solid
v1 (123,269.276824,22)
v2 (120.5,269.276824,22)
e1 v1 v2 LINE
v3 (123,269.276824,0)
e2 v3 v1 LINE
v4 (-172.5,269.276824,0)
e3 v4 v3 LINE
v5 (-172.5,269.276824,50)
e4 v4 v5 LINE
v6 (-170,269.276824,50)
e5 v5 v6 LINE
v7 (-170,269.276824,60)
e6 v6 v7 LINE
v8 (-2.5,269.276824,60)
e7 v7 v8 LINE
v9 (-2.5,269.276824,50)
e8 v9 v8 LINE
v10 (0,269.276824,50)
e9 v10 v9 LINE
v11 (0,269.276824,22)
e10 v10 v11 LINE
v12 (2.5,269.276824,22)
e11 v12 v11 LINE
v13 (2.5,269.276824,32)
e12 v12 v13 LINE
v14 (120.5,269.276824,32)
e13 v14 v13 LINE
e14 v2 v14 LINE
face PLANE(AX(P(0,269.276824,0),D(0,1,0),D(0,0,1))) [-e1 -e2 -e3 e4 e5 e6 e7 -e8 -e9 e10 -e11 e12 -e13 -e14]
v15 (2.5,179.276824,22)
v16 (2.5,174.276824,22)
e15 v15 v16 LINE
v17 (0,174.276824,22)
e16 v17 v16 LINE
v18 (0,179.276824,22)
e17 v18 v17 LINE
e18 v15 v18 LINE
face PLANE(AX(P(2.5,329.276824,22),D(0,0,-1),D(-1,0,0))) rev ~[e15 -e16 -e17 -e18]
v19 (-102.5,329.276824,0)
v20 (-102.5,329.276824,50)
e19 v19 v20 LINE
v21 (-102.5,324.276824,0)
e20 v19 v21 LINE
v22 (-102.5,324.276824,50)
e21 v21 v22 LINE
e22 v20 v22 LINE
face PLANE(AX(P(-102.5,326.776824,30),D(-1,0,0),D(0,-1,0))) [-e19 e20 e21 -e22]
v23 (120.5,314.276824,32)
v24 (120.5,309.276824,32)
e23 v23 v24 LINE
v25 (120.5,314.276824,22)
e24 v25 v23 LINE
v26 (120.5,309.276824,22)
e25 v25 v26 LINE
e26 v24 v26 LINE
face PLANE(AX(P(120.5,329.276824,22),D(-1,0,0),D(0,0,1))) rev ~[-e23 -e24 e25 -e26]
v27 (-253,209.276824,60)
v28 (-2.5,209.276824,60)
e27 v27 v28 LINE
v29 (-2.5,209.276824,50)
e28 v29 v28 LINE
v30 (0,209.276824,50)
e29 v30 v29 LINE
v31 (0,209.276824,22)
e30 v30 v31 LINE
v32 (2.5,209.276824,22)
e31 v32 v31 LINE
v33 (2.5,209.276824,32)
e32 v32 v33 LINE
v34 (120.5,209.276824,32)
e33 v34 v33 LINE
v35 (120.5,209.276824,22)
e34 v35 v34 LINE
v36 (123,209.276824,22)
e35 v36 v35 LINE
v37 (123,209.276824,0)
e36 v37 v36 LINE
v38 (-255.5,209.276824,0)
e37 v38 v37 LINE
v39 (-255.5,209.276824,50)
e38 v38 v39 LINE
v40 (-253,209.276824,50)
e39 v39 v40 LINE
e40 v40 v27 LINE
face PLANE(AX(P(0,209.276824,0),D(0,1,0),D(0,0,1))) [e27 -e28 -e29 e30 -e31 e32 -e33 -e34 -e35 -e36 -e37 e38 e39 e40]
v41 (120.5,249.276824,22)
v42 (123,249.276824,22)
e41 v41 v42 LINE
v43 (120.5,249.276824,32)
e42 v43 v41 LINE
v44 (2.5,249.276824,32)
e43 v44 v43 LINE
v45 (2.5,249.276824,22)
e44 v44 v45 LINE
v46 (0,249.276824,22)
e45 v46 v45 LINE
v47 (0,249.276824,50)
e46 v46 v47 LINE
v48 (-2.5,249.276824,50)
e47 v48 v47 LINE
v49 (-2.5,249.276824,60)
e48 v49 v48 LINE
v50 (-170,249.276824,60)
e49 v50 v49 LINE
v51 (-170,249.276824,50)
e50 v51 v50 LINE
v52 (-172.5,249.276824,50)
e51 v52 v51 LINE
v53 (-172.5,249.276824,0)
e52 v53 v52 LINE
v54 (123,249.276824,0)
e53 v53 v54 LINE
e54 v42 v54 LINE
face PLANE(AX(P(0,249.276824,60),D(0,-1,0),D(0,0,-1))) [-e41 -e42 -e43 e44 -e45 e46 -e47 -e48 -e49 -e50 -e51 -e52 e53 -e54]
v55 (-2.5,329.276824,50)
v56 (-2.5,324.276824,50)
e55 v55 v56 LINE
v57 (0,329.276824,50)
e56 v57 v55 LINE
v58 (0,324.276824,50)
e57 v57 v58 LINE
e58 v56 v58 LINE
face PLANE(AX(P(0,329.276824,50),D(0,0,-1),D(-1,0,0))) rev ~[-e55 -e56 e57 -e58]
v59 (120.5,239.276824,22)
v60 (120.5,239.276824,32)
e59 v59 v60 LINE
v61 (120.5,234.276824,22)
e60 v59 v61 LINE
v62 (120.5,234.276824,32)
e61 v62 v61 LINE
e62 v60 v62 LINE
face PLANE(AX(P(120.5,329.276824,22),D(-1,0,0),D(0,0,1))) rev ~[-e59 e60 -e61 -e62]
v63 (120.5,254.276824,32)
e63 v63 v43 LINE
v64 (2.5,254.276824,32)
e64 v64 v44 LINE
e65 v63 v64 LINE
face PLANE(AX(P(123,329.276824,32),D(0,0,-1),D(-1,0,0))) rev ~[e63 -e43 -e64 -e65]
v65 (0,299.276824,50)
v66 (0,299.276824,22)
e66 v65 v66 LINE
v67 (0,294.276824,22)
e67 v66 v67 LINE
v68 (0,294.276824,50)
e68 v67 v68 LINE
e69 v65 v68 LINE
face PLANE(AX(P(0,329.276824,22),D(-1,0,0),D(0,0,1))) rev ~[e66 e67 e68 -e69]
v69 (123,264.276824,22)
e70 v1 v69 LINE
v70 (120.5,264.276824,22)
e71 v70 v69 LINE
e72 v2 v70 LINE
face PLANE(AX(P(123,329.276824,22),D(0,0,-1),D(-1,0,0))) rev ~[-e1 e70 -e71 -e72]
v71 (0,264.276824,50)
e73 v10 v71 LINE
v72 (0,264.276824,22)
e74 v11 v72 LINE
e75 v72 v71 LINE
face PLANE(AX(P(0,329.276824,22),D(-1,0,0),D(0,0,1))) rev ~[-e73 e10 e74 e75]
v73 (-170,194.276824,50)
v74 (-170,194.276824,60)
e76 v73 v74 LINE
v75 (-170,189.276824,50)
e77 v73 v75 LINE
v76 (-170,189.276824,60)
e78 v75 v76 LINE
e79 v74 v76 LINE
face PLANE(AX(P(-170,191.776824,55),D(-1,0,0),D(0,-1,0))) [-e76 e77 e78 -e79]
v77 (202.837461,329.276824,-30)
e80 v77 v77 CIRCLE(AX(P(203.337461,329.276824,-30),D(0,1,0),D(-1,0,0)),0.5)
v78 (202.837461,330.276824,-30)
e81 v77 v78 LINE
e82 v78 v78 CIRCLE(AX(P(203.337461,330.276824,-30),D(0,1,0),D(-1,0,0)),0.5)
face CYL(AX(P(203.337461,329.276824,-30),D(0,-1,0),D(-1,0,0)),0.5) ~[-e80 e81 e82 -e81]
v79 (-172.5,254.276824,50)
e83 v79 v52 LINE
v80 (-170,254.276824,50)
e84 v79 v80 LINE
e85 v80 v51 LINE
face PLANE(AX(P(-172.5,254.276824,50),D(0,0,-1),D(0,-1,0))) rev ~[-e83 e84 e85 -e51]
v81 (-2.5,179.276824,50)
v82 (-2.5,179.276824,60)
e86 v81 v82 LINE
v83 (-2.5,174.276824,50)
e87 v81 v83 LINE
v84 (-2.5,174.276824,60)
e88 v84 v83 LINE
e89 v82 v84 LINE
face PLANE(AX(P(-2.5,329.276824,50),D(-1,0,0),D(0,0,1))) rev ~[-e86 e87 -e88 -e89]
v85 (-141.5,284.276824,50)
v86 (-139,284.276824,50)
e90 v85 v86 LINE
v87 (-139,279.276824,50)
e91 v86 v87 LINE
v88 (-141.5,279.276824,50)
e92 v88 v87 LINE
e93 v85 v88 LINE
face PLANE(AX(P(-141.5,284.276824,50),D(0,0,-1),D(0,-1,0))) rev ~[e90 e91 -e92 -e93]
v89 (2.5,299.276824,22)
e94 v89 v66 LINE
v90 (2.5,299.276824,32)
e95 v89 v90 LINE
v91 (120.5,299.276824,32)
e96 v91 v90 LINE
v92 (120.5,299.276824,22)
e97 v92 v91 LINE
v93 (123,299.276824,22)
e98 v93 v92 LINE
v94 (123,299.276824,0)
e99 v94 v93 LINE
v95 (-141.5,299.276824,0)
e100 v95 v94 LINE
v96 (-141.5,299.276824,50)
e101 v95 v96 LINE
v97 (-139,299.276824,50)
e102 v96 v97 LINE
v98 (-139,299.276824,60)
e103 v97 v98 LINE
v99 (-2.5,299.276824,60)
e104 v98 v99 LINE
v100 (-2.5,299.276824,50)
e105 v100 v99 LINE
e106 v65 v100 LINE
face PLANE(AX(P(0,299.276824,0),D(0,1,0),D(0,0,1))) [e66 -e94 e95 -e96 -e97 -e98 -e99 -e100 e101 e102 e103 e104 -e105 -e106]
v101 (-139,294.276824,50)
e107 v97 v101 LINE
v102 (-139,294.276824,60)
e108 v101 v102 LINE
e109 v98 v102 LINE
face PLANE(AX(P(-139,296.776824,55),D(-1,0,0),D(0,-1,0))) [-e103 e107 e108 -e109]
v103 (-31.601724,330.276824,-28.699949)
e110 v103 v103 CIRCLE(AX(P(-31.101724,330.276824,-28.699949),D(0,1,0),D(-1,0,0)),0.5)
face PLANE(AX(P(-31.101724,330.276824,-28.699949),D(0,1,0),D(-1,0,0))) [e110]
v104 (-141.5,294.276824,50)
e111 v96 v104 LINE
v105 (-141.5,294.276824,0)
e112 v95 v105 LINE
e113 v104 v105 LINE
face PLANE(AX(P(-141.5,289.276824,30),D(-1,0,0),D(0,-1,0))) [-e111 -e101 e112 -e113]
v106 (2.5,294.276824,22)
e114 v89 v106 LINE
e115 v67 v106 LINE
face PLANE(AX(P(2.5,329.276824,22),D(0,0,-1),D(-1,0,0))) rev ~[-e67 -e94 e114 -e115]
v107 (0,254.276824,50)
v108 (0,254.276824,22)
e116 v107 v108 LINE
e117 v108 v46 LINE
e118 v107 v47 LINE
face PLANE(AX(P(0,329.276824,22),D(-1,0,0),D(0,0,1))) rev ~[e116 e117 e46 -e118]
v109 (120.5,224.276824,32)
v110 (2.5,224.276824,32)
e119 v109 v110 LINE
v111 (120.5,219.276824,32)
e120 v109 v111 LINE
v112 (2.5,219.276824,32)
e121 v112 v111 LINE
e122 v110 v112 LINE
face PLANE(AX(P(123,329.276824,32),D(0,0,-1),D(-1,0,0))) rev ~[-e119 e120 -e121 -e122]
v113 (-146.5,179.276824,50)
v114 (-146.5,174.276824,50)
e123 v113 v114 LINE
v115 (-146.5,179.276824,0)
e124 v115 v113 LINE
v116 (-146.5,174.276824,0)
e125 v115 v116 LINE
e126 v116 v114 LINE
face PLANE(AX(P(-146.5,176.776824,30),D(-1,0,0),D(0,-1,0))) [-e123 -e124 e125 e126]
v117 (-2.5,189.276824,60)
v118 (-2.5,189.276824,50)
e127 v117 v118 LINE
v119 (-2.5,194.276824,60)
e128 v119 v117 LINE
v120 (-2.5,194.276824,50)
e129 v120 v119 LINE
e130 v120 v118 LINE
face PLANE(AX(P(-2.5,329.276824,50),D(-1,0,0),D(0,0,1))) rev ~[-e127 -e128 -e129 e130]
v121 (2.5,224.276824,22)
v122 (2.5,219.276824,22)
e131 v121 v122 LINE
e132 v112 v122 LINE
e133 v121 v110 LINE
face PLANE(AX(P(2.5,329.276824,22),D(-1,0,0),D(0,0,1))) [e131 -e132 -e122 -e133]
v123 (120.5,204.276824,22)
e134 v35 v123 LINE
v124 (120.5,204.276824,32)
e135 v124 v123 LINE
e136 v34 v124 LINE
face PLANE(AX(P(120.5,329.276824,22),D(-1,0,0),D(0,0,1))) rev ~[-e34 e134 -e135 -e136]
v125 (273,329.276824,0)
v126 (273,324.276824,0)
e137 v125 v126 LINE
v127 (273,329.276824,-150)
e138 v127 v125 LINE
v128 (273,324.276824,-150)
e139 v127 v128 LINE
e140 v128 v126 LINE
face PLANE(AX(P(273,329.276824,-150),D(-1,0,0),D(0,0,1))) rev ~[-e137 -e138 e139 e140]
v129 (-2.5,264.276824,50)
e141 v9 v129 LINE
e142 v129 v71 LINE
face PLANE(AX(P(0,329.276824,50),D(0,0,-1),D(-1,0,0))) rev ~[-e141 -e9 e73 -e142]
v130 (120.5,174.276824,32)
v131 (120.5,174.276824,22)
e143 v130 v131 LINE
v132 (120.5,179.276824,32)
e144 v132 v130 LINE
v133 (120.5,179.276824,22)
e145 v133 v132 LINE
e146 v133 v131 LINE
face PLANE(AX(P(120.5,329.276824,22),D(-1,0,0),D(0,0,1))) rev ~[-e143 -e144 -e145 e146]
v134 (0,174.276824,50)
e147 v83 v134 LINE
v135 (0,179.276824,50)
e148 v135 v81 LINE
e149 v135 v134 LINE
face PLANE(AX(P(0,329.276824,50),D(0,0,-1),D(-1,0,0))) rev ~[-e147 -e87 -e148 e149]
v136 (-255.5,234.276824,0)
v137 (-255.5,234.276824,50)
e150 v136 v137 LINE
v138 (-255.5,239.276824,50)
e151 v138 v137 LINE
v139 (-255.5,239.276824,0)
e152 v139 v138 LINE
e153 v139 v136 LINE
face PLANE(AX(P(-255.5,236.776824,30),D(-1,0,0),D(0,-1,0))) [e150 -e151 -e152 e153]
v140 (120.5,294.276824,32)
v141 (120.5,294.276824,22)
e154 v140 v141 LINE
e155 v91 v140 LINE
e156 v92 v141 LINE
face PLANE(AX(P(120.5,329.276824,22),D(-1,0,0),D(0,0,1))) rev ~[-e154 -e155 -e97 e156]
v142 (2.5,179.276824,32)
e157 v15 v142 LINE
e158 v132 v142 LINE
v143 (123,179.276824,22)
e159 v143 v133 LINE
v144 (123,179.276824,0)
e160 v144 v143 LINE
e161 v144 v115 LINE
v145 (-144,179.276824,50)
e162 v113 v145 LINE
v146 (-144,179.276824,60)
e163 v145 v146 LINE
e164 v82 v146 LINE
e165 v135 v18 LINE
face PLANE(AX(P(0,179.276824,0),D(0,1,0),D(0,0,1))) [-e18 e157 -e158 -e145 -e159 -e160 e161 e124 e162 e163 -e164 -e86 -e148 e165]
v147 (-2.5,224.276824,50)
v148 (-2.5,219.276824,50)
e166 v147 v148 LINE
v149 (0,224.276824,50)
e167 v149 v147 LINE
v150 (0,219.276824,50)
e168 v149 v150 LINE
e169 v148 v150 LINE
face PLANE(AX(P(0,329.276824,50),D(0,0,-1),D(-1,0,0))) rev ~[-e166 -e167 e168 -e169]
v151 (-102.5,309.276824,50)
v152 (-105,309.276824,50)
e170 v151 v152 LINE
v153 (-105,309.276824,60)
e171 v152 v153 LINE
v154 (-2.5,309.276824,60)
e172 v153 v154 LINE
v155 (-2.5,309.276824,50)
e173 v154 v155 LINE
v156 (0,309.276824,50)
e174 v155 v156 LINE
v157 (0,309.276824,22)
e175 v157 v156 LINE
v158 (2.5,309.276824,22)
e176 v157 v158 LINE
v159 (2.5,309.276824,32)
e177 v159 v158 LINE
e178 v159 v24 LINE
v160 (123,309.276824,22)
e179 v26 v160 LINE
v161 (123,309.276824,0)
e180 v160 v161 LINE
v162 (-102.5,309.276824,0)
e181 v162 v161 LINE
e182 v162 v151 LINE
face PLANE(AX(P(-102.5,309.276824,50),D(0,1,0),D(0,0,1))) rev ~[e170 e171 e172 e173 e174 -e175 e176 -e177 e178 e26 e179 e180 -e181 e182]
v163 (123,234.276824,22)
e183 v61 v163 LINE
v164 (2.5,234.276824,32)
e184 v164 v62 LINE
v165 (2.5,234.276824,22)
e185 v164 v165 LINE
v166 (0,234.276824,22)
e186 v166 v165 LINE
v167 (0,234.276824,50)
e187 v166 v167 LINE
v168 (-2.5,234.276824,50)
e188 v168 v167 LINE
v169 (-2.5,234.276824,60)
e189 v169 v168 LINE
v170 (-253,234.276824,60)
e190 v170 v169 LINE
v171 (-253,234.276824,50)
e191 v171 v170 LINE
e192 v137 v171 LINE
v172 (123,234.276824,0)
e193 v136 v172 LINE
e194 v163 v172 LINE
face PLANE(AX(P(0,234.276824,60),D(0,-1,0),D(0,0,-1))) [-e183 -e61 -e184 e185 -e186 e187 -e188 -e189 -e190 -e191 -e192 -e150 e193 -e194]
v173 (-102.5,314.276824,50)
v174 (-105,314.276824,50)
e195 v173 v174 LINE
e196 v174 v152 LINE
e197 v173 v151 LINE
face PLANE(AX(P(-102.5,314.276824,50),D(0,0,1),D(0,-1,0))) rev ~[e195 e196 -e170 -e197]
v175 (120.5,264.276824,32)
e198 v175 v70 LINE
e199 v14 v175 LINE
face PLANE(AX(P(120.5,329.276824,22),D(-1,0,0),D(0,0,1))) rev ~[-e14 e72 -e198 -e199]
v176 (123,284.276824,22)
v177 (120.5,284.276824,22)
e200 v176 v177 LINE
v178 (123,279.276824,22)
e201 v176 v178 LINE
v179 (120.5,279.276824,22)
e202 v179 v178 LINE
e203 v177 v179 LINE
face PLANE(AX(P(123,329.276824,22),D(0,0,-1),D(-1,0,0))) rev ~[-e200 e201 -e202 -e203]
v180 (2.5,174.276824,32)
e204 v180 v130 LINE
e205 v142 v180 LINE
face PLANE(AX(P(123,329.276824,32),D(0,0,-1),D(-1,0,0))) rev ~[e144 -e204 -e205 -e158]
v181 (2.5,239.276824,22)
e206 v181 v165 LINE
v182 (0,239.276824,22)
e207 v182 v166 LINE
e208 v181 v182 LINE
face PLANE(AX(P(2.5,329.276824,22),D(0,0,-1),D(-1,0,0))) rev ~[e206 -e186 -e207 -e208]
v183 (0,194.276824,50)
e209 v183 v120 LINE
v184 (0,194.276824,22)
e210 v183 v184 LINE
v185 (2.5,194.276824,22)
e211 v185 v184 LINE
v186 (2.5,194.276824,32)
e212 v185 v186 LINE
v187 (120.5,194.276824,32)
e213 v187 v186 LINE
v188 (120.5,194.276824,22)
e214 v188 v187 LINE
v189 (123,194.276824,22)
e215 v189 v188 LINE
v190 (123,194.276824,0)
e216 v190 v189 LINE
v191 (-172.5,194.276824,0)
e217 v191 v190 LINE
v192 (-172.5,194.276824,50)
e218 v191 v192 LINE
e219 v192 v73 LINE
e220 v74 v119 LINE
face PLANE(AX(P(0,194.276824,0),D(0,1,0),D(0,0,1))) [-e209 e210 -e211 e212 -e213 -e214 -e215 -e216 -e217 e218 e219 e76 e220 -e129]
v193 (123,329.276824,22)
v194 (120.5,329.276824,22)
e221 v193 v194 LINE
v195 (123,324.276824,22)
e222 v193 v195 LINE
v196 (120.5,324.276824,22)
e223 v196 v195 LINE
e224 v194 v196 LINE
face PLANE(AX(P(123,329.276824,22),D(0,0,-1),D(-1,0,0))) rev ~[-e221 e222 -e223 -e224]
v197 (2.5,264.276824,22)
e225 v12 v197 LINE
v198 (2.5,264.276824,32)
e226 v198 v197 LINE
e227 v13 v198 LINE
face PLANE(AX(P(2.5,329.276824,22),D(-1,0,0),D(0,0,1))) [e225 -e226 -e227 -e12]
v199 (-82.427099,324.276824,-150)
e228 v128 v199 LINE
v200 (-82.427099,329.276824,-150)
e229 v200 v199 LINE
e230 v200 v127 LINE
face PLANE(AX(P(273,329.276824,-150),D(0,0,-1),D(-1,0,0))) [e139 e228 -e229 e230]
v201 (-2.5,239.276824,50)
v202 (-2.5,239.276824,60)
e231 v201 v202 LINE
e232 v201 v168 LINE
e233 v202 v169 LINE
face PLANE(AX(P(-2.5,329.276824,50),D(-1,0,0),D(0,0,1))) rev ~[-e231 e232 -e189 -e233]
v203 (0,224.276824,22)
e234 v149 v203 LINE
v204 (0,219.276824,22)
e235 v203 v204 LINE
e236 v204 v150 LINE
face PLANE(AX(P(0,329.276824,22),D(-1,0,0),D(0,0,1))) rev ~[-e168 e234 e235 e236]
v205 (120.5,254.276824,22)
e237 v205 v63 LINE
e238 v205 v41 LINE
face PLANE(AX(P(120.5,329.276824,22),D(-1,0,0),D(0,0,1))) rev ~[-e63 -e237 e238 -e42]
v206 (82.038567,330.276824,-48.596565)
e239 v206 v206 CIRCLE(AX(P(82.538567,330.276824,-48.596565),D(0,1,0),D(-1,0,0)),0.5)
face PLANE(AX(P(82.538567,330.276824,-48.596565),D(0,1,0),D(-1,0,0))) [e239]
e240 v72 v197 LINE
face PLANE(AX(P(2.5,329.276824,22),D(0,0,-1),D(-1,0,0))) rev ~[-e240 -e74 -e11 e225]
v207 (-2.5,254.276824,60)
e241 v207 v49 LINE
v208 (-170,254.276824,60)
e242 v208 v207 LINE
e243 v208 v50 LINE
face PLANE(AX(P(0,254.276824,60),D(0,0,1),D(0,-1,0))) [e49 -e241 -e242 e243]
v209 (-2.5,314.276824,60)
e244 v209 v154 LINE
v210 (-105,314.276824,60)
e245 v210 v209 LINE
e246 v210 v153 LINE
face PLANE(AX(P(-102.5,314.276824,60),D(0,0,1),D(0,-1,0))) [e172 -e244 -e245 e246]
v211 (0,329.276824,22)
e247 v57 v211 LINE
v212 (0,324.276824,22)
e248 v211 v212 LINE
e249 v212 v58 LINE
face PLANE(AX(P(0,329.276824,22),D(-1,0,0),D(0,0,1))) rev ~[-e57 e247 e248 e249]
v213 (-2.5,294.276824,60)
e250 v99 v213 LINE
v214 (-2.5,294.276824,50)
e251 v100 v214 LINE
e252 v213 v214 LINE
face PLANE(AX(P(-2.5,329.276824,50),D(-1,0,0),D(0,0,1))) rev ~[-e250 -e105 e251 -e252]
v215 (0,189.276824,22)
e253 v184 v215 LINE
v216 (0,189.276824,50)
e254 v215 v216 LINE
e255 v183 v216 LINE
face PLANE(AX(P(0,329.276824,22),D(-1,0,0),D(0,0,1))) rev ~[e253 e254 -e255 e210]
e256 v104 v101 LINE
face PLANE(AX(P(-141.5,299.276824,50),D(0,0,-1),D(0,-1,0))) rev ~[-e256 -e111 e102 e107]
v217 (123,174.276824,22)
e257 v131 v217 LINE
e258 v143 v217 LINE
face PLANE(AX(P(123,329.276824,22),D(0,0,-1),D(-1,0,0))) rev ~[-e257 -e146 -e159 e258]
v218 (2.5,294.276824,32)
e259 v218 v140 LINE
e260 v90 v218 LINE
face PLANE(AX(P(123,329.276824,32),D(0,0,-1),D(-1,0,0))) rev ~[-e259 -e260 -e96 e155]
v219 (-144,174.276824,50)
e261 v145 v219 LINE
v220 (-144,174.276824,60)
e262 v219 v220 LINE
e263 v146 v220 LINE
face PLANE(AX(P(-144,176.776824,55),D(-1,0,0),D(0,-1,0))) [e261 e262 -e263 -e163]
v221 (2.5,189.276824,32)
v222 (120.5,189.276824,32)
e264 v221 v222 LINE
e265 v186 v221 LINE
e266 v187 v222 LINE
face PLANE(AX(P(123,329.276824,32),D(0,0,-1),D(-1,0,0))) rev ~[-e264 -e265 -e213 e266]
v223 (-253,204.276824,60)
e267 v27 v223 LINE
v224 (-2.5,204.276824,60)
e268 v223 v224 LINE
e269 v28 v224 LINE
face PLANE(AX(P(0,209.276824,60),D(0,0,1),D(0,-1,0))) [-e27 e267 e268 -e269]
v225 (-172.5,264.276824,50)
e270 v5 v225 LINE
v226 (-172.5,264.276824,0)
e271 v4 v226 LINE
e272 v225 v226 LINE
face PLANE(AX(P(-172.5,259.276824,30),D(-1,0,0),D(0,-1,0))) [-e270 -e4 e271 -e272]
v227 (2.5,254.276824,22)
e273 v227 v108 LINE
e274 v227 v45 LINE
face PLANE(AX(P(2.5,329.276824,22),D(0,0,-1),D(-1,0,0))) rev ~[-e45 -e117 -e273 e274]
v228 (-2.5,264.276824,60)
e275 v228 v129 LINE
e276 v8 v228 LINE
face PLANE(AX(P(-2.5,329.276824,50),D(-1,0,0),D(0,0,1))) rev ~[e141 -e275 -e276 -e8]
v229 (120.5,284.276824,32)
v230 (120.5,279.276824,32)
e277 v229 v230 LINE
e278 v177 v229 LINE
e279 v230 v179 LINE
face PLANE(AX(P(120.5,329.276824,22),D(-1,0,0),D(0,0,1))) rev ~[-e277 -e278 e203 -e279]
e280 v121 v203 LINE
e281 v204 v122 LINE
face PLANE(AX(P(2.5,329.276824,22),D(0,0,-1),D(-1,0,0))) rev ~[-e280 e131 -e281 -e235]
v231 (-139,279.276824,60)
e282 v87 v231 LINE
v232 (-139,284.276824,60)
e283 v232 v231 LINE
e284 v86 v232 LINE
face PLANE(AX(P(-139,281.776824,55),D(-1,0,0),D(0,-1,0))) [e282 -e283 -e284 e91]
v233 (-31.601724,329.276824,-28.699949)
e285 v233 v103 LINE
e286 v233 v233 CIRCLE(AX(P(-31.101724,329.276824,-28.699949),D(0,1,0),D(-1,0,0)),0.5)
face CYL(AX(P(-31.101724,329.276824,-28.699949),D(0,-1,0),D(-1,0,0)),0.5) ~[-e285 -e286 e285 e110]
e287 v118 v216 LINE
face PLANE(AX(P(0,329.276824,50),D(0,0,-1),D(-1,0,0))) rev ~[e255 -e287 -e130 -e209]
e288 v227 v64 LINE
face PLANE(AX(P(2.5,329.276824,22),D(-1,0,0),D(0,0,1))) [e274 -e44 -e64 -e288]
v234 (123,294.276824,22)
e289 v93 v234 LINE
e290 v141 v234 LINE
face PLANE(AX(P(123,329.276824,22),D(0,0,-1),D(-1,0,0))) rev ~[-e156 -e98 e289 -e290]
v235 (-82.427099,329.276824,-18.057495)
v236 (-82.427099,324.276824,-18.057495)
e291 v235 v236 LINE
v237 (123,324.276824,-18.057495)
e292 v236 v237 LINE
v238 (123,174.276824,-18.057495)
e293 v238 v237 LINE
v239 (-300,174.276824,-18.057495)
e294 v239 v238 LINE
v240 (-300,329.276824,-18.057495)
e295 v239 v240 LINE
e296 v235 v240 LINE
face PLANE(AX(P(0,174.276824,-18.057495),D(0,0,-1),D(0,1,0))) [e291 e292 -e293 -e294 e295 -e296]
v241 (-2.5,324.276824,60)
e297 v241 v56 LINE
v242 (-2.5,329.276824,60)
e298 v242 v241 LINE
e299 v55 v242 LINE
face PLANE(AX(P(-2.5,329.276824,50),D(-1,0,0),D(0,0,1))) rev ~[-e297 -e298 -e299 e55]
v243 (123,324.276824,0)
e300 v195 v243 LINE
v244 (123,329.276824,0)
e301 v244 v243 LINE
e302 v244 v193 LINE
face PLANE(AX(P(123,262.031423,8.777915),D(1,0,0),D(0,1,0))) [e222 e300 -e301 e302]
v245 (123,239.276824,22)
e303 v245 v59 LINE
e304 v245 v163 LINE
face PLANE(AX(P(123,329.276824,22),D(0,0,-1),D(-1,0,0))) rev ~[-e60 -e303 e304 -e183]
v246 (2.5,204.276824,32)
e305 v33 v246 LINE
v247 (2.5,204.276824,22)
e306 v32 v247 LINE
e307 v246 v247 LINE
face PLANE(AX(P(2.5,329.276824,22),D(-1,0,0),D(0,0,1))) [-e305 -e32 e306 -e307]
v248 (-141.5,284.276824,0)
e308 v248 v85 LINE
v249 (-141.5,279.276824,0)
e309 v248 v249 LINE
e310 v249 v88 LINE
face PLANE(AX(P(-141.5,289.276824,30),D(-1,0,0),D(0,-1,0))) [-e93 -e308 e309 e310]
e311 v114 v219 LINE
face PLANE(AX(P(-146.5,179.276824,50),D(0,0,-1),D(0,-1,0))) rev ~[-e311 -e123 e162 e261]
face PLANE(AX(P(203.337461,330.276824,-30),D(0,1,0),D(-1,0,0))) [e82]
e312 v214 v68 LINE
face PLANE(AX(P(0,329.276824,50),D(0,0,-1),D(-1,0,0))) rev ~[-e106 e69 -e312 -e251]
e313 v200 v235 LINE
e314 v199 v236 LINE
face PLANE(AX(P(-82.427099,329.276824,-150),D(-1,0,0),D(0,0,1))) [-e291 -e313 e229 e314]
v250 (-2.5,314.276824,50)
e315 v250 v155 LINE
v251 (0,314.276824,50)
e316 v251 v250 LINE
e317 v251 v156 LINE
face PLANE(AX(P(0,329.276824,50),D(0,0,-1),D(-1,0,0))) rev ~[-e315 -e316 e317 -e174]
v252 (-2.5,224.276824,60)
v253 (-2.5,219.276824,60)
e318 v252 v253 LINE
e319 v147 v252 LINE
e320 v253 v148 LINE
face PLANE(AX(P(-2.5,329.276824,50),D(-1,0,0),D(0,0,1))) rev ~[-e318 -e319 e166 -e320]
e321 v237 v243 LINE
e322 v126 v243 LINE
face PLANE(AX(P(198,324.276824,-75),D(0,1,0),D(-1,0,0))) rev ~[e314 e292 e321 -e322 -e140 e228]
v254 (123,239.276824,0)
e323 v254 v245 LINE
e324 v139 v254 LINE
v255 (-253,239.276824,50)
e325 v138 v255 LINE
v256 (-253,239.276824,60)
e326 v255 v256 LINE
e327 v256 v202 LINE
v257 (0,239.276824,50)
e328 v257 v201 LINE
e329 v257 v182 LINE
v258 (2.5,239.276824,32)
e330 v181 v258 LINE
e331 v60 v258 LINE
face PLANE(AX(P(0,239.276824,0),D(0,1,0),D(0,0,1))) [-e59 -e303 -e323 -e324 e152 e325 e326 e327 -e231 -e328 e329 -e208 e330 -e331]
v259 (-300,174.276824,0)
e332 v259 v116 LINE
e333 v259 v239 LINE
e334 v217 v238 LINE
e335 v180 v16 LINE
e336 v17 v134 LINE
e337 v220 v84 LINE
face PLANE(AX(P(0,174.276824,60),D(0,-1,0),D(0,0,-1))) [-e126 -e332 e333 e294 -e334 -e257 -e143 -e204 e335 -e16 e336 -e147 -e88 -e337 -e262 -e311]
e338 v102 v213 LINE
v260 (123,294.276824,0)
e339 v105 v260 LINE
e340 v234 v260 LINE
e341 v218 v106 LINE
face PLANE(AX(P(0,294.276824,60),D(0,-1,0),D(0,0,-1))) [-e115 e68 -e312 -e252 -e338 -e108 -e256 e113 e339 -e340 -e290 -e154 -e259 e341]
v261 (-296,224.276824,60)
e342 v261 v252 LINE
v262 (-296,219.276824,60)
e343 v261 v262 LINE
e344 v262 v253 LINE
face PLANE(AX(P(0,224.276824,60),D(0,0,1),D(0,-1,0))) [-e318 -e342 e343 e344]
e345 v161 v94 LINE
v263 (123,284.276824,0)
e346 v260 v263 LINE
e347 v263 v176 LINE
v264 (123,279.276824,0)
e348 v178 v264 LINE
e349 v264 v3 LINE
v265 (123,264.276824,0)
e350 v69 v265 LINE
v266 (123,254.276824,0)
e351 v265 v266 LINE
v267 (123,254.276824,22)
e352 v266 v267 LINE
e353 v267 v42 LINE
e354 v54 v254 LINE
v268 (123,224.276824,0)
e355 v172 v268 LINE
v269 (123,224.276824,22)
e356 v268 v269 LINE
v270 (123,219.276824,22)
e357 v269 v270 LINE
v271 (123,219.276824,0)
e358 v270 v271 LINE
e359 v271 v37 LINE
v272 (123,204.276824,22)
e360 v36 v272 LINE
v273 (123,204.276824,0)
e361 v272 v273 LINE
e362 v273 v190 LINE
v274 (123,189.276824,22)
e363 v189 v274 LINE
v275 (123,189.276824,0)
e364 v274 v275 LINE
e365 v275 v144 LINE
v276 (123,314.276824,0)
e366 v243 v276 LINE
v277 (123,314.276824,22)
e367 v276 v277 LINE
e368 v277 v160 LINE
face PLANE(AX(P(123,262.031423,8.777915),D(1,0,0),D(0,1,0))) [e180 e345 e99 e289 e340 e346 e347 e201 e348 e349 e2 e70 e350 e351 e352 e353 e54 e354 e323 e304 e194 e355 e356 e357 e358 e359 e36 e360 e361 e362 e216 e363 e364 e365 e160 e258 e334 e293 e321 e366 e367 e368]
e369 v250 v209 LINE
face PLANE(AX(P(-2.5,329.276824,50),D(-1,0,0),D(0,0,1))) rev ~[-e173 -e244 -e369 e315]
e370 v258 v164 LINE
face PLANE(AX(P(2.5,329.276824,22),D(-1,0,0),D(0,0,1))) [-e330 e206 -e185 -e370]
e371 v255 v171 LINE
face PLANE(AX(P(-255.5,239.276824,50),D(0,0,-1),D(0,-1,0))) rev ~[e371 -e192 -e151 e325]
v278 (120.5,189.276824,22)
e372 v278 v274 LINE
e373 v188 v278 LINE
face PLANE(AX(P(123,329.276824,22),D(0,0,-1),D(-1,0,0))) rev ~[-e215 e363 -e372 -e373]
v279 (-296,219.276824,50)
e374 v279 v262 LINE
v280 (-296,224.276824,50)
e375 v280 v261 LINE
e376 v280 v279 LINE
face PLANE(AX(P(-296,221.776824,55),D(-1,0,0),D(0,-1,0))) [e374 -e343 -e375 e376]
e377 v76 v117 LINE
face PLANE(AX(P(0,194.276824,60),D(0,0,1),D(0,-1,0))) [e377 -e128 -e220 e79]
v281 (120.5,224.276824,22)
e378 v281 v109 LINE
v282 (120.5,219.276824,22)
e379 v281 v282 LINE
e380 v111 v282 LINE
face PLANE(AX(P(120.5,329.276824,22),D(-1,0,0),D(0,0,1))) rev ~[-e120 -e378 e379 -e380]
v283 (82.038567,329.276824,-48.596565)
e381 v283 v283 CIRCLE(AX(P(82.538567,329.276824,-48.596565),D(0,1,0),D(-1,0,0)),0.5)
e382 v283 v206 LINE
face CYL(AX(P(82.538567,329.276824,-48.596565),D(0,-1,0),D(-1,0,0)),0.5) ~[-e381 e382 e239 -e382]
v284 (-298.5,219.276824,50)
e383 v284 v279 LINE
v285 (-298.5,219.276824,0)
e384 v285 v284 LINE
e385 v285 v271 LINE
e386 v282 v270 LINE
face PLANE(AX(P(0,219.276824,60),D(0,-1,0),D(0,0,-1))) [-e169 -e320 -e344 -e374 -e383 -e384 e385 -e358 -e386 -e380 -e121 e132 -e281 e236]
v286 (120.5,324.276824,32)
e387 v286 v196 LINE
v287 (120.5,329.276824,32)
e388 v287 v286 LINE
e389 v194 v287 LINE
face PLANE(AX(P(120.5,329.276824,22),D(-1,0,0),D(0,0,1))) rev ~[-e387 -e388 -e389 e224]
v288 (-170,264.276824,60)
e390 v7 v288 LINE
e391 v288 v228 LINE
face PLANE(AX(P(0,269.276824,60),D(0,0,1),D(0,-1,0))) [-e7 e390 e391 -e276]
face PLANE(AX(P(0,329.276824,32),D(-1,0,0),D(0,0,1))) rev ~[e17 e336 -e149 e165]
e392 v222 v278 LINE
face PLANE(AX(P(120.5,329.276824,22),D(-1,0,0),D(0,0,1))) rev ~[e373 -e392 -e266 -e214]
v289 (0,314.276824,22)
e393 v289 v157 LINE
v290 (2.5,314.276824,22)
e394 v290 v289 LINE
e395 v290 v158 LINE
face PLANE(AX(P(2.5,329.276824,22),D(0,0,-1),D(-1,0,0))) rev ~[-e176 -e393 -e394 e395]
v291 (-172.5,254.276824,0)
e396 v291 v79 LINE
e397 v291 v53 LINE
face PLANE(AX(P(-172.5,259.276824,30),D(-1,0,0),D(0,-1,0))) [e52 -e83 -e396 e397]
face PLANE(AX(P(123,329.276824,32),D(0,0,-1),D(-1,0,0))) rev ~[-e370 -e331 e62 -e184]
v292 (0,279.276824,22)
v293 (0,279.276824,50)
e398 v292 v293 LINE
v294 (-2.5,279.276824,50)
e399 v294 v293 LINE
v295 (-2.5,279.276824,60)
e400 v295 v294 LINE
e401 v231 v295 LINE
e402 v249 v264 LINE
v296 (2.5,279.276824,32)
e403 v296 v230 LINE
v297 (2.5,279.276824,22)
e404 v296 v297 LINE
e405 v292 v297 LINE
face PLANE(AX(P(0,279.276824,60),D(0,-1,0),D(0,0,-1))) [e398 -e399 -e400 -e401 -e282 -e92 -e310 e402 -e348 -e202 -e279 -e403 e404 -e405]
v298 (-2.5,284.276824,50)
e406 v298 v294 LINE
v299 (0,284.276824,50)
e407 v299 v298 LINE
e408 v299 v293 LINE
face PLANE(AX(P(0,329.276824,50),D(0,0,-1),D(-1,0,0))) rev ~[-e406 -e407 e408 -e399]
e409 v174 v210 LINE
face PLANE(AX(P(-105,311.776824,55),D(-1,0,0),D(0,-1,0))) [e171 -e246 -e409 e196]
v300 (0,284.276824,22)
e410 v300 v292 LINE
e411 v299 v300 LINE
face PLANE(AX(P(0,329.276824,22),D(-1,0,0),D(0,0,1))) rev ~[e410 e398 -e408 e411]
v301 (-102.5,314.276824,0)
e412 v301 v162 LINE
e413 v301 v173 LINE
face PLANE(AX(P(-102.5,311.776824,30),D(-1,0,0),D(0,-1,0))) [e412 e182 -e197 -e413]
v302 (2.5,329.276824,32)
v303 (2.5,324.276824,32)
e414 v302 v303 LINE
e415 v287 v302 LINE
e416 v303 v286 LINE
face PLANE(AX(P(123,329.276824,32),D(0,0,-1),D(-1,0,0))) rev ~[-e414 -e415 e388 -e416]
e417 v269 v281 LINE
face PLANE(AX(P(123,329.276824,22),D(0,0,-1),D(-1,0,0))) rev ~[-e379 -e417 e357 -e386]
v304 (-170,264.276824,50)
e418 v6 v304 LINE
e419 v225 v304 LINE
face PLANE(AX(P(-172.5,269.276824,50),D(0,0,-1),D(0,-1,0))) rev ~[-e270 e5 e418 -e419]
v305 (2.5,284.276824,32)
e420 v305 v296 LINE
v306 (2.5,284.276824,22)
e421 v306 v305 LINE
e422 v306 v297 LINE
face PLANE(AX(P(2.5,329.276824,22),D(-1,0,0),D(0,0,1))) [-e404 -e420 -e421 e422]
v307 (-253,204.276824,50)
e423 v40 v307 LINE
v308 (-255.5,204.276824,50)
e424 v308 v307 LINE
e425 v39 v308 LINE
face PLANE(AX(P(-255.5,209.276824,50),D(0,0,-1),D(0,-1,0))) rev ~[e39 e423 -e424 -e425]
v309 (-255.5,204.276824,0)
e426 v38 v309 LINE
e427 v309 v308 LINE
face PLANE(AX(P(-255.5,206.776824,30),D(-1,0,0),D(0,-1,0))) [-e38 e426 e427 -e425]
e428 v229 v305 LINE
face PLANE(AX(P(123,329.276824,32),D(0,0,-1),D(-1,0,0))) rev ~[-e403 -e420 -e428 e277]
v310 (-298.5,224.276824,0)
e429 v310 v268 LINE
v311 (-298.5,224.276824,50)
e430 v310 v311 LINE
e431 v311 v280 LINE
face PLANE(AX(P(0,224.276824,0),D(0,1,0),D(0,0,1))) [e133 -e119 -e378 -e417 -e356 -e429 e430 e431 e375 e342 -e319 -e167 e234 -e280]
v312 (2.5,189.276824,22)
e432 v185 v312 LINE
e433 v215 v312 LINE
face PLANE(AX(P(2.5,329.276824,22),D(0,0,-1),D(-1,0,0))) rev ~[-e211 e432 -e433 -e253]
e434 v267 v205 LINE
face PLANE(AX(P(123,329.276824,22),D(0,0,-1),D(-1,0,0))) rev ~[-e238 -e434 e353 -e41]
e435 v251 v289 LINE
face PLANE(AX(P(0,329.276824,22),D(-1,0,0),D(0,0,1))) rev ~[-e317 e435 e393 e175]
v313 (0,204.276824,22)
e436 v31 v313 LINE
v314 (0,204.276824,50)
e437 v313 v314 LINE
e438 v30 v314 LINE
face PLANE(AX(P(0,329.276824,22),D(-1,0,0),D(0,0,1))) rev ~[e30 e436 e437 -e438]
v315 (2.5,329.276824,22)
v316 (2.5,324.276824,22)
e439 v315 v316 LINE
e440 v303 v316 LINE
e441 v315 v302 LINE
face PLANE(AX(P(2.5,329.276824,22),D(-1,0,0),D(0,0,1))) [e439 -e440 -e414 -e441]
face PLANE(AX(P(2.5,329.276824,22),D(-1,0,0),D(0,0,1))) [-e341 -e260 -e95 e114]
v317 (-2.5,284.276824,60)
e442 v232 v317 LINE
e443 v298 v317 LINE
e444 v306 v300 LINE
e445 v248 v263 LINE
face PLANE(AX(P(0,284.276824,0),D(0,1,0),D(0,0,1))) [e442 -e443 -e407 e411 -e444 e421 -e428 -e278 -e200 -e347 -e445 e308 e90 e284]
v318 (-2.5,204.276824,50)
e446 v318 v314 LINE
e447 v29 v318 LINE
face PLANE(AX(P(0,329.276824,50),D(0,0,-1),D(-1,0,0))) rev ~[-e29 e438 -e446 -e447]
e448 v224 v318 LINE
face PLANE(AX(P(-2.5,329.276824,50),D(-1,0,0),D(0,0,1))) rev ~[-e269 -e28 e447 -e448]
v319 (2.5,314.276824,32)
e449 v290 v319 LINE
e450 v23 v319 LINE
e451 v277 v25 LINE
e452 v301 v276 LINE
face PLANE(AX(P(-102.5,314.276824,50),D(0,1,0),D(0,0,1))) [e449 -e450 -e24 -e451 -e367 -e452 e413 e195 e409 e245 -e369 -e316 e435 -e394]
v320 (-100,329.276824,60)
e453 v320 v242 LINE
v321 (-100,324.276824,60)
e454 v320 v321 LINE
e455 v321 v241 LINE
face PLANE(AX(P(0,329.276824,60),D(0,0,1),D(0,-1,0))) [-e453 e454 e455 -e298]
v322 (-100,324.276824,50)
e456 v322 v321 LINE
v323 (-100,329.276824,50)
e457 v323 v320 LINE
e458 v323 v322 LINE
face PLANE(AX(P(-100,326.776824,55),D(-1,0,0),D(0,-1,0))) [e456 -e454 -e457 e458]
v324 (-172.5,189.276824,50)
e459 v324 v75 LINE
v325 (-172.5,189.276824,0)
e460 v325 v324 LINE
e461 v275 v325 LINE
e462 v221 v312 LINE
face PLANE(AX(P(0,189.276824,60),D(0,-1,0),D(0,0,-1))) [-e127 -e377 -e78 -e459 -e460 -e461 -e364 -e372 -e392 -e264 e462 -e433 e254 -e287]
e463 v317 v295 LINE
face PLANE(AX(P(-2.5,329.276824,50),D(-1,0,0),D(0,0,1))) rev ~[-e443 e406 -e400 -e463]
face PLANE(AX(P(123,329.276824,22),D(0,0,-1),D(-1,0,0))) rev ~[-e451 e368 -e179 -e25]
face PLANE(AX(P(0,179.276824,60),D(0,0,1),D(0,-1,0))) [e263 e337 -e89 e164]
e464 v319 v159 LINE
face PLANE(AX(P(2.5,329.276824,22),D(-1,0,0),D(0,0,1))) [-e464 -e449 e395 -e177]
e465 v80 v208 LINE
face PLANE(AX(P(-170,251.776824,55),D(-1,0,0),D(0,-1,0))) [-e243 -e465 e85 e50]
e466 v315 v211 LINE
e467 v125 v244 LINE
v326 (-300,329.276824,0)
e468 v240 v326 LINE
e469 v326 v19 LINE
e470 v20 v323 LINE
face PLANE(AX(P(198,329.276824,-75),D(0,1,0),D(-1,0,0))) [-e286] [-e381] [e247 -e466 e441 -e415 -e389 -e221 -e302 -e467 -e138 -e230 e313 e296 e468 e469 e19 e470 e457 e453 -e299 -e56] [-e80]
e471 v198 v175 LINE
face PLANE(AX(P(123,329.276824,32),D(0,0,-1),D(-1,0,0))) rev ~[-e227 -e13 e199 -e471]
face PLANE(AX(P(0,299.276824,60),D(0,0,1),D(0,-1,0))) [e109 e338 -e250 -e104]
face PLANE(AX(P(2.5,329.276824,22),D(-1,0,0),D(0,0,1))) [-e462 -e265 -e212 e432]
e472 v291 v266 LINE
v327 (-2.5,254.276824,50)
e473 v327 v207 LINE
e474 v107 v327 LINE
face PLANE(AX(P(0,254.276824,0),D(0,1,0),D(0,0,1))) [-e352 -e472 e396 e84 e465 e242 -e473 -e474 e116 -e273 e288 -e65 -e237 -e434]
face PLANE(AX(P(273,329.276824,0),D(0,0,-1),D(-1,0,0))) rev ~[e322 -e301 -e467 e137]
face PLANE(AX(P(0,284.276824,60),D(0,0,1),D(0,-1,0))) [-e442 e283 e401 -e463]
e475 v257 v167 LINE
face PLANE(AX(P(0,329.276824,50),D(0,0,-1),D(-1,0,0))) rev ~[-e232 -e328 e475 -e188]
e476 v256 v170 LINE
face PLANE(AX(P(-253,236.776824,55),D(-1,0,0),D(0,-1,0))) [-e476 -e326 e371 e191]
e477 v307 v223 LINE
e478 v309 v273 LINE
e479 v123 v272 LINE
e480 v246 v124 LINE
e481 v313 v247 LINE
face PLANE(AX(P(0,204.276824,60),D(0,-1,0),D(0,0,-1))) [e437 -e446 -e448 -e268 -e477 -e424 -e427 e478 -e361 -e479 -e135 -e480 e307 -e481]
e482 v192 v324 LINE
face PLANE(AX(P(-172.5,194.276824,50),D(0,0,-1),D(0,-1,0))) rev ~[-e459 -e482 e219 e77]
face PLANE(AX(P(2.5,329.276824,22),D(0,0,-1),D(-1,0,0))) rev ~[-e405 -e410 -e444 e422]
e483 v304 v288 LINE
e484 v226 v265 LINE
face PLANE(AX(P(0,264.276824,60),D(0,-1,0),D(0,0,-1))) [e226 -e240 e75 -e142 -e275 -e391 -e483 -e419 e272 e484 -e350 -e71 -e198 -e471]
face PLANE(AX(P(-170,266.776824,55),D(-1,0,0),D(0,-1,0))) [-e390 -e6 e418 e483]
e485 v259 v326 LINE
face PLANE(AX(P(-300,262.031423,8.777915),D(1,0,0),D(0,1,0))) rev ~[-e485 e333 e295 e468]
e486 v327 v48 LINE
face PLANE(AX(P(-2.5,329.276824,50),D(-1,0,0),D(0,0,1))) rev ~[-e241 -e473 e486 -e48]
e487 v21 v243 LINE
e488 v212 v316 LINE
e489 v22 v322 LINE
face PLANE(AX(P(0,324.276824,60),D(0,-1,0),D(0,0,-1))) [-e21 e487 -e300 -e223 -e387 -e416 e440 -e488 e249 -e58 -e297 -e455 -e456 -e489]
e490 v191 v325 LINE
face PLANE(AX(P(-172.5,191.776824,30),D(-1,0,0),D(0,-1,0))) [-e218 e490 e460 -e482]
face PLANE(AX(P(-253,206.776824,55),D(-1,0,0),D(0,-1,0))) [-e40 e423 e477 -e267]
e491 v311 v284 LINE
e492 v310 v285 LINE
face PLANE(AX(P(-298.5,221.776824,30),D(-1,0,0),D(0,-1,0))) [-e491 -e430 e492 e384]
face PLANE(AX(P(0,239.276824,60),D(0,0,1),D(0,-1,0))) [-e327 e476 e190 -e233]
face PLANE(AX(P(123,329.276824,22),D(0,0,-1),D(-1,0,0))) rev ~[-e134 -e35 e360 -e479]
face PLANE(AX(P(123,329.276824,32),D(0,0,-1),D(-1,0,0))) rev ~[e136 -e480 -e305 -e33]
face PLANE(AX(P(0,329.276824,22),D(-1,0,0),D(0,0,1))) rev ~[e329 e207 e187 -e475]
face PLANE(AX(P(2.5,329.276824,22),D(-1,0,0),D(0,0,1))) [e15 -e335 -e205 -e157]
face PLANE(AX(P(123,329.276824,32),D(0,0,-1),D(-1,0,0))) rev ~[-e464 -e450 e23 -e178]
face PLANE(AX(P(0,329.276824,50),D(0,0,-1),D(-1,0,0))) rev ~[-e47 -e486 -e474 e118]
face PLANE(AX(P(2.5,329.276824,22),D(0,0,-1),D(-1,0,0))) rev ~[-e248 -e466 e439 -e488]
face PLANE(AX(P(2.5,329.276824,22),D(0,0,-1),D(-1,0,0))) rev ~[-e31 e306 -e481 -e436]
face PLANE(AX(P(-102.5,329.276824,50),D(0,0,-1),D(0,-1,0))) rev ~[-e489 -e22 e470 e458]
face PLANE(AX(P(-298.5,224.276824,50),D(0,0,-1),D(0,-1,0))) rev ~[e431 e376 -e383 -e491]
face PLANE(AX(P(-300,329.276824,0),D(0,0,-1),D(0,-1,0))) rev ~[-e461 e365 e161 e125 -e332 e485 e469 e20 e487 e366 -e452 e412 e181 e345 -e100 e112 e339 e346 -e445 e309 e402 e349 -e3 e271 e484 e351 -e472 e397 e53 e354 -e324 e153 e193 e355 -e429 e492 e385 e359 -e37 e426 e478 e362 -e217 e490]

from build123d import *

# Parameters (mm, degrees)
F1_DEPTH  = 123
F2_DEPTH  = 300
F3_R      = 0.5
F4_DEPTH  = 1
F5_W      = 123
F5_H      = 28
F6_DEPTH  = 300
F7_W      = 2.5
F7_H      = 10
F8_DEPTH  = 300
F9_W      = 150
F9_H      = 150
F10_DEPTH = 5
F11_W     = 5
F11_H     = 60
F12_DEPTH = 197.5
F13_W     = 20
F13_H     = 60
F14_DEPTH = 158.5
F15_W     = 20
F15_H     = 60
F15_W_2   = 5
F16_DEPTH = 127.5
F17_W     = 5
F17_H     = 60
F18_DEPTH = 44.5
F19_W     = 5
F19_H     = 60
F20_DEPTH = 1.5
F21_W     = 5
F21_H     = 60
F22_DEPTH = 153.5
F23_W     = 5
F23_H     = 10
F24_DEPTH = 2.5
F25_W     = 5
F25_H     = 10
F26_DEPTH = 2.5
F27_W     = 5
F27_H     = 10
F28_DEPTH = 2.5
F29_W     = 5
F29_H     = 10
F30_DEPTH = 2.5
F31_W     = 5
F31_H     = 10
F32_DEPTH = 2.5
F33_W     = 5
F33_H     = 10
F34_DEPTH = 2.5
F35_W     = 5
F35_H     = 10
F36_DEPTH = 2.5
F37_W     = 5
F37_H     = 10
F38_DEPTH = 2.5
F39_W     = 5
F39_H     = 10
F40_DEPTH = 2.5
F41_W     = 5
F41_H     = 10
F42_DEPTH = 2.5
F43_W     = 5
F43_H     = 10
F44_DEPTH = 2.5
F45_W     = 217.5729006529
F45_H     = 131.9425046444
F46_DEPTH = 5


# Not quite as in the source:
# - a feature names something its author has since deleted; it is built from what else it names


with BuildPart() as f1:
    # F0 (on Right) → F1 (new body)
    with BuildSketch(Plane.YZ):
        Polygon((179.2768240368, 60), (174.2768240368, 60), (174.2768240368, -18.0574953556), (324.2768240368, -18.0574953556), (324.2768240368, -150), (329.2768240368, -150), (329.2768240368, 60), (324.2768240368, 60), (324.2768240368, 0), (314.2768240368, 0), (314.2768240368, 60), (309.2768240368, 60), (309.2768240368, 0), (299.2768240368, 0), (299.2768240368, 60), (294.2768240368, 60), (294.2768240368, 0), (284.2768240368, 0), (284.2768240368, 60), (279.2768240368, 60), (279.2768240368, 0), (269.2768240368, 0), (269.2768240368, 60), (264.2768240368, 60), (264.2768240368, 0), (254.2768240368, 0), (254.2768240368, 60), (249.2768240368, 60), (249.2768240368, 0), (239.2768240368, 0), (239.2768240368, 60), (234.2768240368, 60), (234.2768240368, 0), (224.2768240368, 0), (224.2768240368, 60), (219.2768240368, 60), (219.2768240368, 0), (209.2768240368, 0), (209.2768240368, 60), (204.2768240368, 60), (204.2768240368, 0), (194.2768240368, 0), (194.2768240368, 60), (189.2768240368, 60), (189.2768240368, 0), (179.2768240368, 0), align=None)
    extrude(amount=F1_DEPTH)

    # F0 (on Right) → F2 (join)
    with BuildSketch(Plane.YZ):
        Polygon((179.2768240368, 60), (174.2768240368, 60), (174.2768240368, -18.0574953556), (324.2768240368, -18.0574953556), (324.2768240368, -150), (329.2768240368, -150), (329.2768240368, 60), (324.2768240368, 60), (324.2768240368, 0), (314.2768240368, 0), (314.2768240368, 60), (309.2768240368, 60), (309.2768240368, 0), (299.2768240368, 0), (299.2768240368, 60), (294.2768240368, 60), (294.2768240368, 0), (284.2768240368, 0), (284.2768240368, 60), (279.2768240368, 60), (279.2768240368, 0), (269.2768240368, 0), (269.2768240368, 60), (264.2768240368, 60), (264.2768240368, 0), (254.2768240368, 0), (254.2768240368, 60), (249.2768240368, 60), (249.2768240368, 0), (239.2768240368, 0), (239.2768240368, 60), (234.2768240368, 60), (234.2768240368, 0), (224.2768240368, 0), (224.2768240368, 60), (219.2768240368, 60), (219.2768240368, 0), (209.2768240368, 0), (209.2768240368, 60), (204.2768240368, 60), (204.2768240368, 0), (194.2768240368, 0), (194.2768240368, 60), (189.2768240368, 60), (189.2768240368, 0), (179.2768240368, 0), align=None)
    extrude(amount=-F2_DEPTH)

    # F3 (on face) → F4, piece 2 (join)
    with BuildSketch(Plane(origin=(0, 329.2768240368, 0), x_dir=(-1, 0, 0), z_dir=(0, 1, 0))):
        with Locations((-82.5385674834, -48.5965646803)):
            Circle(F3_R)
        with Locations((31.1017241329, -28.6999493837)):
            Circle(F3_R)
    extrude(amount=F4_DEPTH)

    # F5 (on face) → F6 (cut)
    with BuildSketch(Plane(origin=(0, 329.2768240368, 0), x_dir=(-1, 0, 0), z_dir=(0, 1, 0))):
        with Locations((-61.5, 46)):
            Rectangle(F5_W, F5_H)
    extrude(amount=-F6_DEPTH, mode=Mode.SUBTRACT)

    # F7 (on face) → F8 (cut)
    with BuildSketch(Plane(origin=(0, 329.2768240368, 0), x_dir=(-1, 0, 0), z_dir=(0, 1, 0))):
        with Locations((-1.25, 27)):
            Rectangle(F7_W, F7_H)
        with Locations((1.25, 55)):
            Rectangle(F7_W, F7_H)
        with Locations((-121.75, 27)):
            Rectangle(F7_W, F7_H)
    extrude(amount=-F8_DEPTH, mode=Mode.SUBTRACT)



with BuildPart() as f4:
    # F3 (on face) → F4 (new body)
    with BuildSketch(Plane(origin=(0, 329.2768240368, 0), x_dir=(-1, 0, 0), z_dir=(0, 1, 0))):
        with Locations((-203.3374607563, -30)):
            Circle(F3_R)
    extrude(amount=F4_DEPTH)


with BuildPart() as f1_1:
    add(f1.part)

    add(f4.part)  # F10 merges F4
    # F9 (on face) → F10 (join)
    with BuildSketch(Plane(origin=(0, 329.2768240368, 0), x_dir=(-1, 0, 0), z_dir=(0, 1, 0))):
        with Locations((-198, -75)):
            Rectangle(F9_W, F9_H)
    extrude(amount=-F10_DEPTH)

    # F11 (on face) → F12 (cut)
    with BuildSketch(Plane(origin=(-300, 0, 0), x_dir=(0, -1, 0), z_dir=(-1, 0, 0))):
        with Locations((-326.7768240368, 30)):
            Rectangle(F11_W, F11_H)
        with Locations((-311.7768240368, 30)):
            Rectangle(F11_W, F11_H)
    extrude(amount=-F12_DEPTH, mode=Mode.SUBTRACT)

    # F13 (on face) → F14 (cut)
    with BuildSketch(Plane(origin=(-300, 0, 0), x_dir=(0, -1, 0), z_dir=(-1, 0, 0))):
        with Locations((-289.2768240368, 30)):
            Rectangle(F13_W, F13_H)
    extrude(amount=-F14_DEPTH, mode=Mode.SUBTRACT)

    # F15 (on face) → F16 (cut)
    with BuildSketch(Plane(origin=(-300, 0, 0), x_dir=(0, -1, 0), z_dir=(-1, 0, 0))):
        with Locations((-259.2768240368, 30)):
            Rectangle(F15_W, F15_H)
        with Locations((-191.7768240368, 30)):
            Rectangle(F15_W_2, F15_H)
    extrude(amount=-F16_DEPTH, mode=Mode.SUBTRACT)

    # F17 (on face) → F18 (cut)
    with BuildSketch(Plane(origin=(-300, 0, 0), x_dir=(0, -1, 0), z_dir=(-1, 0, 0))):
        with Locations((-236.7768240368, 30)):
            Rectangle(F17_W, F17_H)
        with Locations((-206.7768240368, 30)):
            Rectangle(F17_W, F17_H)
    extrude(amount=-F18_DEPTH, mode=Mode.SUBTRACT)

    # F19 (on face) → F20 (cut)
    with BuildSketch(Plane(origin=(-300, 0, 0), x_dir=(0, -1, 0), z_dir=(-1, 0, 0))):
        with Locations((-221.7768240368, 30)):
            Rectangle(F19_W, F19_H)
    extrude(amount=-F20_DEPTH, mode=Mode.SUBTRACT)

    # F21 (on face) → F22 (cut)
    with BuildSketch(Plane(origin=(-300, 0, 0), x_dir=(0, -1, 0), z_dir=(-1, 0, 0))):
        with Locations((-176.7768240368, 30)):
            Rectangle(F21_W, F21_H)
    extrude(amount=-F22_DEPTH, mode=Mode.SUBTRACT)

    # F23 (on face) → F24 (cut)
    with BuildSketch(Plane(origin=(-298.5, 0, 0), x_dir=(0, -1, 0), z_dir=(-1, 0, 0))):
        with Locations((-221.7768240368, 55)):
            Rectangle(F23_W, F23_H)
    extrude(amount=-F24_DEPTH, mode=Mode.SUBTRACT)

    # F25 (on face) → F26 (cut)
    with BuildSketch(Plane(origin=(-255.5, 0, 0), x_dir=(0, -1, 0), z_dir=(-1, 0, 0))):
        with Locations((-236.7768240368, 55)):
            Rectangle(F25_W, F25_H)
    extrude(amount=-F26_DEPTH, mode=Mode.SUBTRACT)

    # F27 (on face) → F28 (cut)
    with BuildSketch(Plane(origin=(-255.5, 0, 0), x_dir=(0, -1, 0), z_dir=(-1, 0, 0))):
        with Locations((-206.7768240368, 55)):
            Rectangle(F27_W, F27_H)
    extrude(amount=-F28_DEPTH, mode=Mode.SUBTRACT)

    # F29 (on face) → F30 (cut)
    with BuildSketch(Plane(origin=(-172.5, 0, 0), x_dir=(0, -1, 0), z_dir=(-1, 0, 0))):
        with Locations((-251.7768240368, 55)):
            Rectangle(F29_W, F29_H)
    extrude(amount=-F30_DEPTH, mode=Mode.SUBTRACT)

    # F31 (on face) → F32 (cut)
    with BuildSketch(Plane(origin=(-172.5, 0, 0), x_dir=(0, -1, 0), z_dir=(-1, 0, 0))):
        with Locations((-191.7768240368, 55)):
            Rectangle(F31_W, F31_H)
    extrude(amount=-F32_DEPTH, mode=Mode.SUBTRACT)

    # F33 (on face) → F34 (cut)
    with BuildSketch(Plane(origin=(-172.5, 0, 0), x_dir=(0, -1, 0), z_dir=(-1, 0, 0))):
        with Locations((-266.7768240368, 55)):
            Rectangle(F33_W, F33_H)
    extrude(amount=-F34_DEPTH, mode=Mode.SUBTRACT)

    # F35 (on face) → F36 (cut)
    with BuildSketch(Plane(origin=(-146.5, 0, 0), x_dir=(0, -1, 0), z_dir=(-1, 0, 0))):
        with Locations((-176.7768240368, 55)):
            Rectangle(F35_W, F35_H)
    extrude(amount=-F36_DEPTH, mode=Mode.SUBTRACT)

    # F37 (on face) → F38 (cut)
    with BuildSketch(Plane(origin=(-141.5, 0, 0), x_dir=(0, -1, 0), z_dir=(-1, 0, 0))):
        with Locations((-281.7768240368, 55)):
            Rectangle(F37_W, F37_H)
    extrude(amount=-F38_DEPTH, mode=Mode.SUBTRACT)

    # F39 (on face) → F40 (cut)
    with BuildSketch(Plane(origin=(-141.5, 0, 0), x_dir=(0, -1, 0), z_dir=(-1, 0, 0))):
        with Locations((-296.7768240368, 55)):
            Rectangle(F39_W, F39_H)
    extrude(amount=-F40_DEPTH, mode=Mode.SUBTRACT)

    # F41 (on face) → F42 (join)
    with BuildSketch(Plane(origin=(-102.5, 0, 0), x_dir=(0, -1, 0), z_dir=(-1, 0, 0))):
        with Locations((-311.7768240368, 55)):
            Rectangle(F41_W, F41_H)
    extrude(amount=F42_DEPTH)

    # F43 (on face) → F44 (cut)
    with BuildSketch(Plane(origin=(-102.5, 0, 0), x_dir=(0, -1, 0), z_dir=(-1, 0, 0))):
        with Locations((-326.7768240368, 55)):
            Rectangle(F43_W, F43_H)
    extrude(amount=-F44_DEPTH, mode=Mode.SUBTRACT)

    # F45 (on face) → F46 (cut)
    with BuildSketch(Plane(origin=(0, 329.2768240368, 0), x_dir=(-1, 0, 0), z_dir=(0, 1, 0))):
        with Locations((191.2135496736, -84.0287476778)):
            Rectangle(F45_W, F45_H)
    extrude(amount=-F46_DEPTH, mode=Mode.SUBTRACT)


solid = f1_1.part
